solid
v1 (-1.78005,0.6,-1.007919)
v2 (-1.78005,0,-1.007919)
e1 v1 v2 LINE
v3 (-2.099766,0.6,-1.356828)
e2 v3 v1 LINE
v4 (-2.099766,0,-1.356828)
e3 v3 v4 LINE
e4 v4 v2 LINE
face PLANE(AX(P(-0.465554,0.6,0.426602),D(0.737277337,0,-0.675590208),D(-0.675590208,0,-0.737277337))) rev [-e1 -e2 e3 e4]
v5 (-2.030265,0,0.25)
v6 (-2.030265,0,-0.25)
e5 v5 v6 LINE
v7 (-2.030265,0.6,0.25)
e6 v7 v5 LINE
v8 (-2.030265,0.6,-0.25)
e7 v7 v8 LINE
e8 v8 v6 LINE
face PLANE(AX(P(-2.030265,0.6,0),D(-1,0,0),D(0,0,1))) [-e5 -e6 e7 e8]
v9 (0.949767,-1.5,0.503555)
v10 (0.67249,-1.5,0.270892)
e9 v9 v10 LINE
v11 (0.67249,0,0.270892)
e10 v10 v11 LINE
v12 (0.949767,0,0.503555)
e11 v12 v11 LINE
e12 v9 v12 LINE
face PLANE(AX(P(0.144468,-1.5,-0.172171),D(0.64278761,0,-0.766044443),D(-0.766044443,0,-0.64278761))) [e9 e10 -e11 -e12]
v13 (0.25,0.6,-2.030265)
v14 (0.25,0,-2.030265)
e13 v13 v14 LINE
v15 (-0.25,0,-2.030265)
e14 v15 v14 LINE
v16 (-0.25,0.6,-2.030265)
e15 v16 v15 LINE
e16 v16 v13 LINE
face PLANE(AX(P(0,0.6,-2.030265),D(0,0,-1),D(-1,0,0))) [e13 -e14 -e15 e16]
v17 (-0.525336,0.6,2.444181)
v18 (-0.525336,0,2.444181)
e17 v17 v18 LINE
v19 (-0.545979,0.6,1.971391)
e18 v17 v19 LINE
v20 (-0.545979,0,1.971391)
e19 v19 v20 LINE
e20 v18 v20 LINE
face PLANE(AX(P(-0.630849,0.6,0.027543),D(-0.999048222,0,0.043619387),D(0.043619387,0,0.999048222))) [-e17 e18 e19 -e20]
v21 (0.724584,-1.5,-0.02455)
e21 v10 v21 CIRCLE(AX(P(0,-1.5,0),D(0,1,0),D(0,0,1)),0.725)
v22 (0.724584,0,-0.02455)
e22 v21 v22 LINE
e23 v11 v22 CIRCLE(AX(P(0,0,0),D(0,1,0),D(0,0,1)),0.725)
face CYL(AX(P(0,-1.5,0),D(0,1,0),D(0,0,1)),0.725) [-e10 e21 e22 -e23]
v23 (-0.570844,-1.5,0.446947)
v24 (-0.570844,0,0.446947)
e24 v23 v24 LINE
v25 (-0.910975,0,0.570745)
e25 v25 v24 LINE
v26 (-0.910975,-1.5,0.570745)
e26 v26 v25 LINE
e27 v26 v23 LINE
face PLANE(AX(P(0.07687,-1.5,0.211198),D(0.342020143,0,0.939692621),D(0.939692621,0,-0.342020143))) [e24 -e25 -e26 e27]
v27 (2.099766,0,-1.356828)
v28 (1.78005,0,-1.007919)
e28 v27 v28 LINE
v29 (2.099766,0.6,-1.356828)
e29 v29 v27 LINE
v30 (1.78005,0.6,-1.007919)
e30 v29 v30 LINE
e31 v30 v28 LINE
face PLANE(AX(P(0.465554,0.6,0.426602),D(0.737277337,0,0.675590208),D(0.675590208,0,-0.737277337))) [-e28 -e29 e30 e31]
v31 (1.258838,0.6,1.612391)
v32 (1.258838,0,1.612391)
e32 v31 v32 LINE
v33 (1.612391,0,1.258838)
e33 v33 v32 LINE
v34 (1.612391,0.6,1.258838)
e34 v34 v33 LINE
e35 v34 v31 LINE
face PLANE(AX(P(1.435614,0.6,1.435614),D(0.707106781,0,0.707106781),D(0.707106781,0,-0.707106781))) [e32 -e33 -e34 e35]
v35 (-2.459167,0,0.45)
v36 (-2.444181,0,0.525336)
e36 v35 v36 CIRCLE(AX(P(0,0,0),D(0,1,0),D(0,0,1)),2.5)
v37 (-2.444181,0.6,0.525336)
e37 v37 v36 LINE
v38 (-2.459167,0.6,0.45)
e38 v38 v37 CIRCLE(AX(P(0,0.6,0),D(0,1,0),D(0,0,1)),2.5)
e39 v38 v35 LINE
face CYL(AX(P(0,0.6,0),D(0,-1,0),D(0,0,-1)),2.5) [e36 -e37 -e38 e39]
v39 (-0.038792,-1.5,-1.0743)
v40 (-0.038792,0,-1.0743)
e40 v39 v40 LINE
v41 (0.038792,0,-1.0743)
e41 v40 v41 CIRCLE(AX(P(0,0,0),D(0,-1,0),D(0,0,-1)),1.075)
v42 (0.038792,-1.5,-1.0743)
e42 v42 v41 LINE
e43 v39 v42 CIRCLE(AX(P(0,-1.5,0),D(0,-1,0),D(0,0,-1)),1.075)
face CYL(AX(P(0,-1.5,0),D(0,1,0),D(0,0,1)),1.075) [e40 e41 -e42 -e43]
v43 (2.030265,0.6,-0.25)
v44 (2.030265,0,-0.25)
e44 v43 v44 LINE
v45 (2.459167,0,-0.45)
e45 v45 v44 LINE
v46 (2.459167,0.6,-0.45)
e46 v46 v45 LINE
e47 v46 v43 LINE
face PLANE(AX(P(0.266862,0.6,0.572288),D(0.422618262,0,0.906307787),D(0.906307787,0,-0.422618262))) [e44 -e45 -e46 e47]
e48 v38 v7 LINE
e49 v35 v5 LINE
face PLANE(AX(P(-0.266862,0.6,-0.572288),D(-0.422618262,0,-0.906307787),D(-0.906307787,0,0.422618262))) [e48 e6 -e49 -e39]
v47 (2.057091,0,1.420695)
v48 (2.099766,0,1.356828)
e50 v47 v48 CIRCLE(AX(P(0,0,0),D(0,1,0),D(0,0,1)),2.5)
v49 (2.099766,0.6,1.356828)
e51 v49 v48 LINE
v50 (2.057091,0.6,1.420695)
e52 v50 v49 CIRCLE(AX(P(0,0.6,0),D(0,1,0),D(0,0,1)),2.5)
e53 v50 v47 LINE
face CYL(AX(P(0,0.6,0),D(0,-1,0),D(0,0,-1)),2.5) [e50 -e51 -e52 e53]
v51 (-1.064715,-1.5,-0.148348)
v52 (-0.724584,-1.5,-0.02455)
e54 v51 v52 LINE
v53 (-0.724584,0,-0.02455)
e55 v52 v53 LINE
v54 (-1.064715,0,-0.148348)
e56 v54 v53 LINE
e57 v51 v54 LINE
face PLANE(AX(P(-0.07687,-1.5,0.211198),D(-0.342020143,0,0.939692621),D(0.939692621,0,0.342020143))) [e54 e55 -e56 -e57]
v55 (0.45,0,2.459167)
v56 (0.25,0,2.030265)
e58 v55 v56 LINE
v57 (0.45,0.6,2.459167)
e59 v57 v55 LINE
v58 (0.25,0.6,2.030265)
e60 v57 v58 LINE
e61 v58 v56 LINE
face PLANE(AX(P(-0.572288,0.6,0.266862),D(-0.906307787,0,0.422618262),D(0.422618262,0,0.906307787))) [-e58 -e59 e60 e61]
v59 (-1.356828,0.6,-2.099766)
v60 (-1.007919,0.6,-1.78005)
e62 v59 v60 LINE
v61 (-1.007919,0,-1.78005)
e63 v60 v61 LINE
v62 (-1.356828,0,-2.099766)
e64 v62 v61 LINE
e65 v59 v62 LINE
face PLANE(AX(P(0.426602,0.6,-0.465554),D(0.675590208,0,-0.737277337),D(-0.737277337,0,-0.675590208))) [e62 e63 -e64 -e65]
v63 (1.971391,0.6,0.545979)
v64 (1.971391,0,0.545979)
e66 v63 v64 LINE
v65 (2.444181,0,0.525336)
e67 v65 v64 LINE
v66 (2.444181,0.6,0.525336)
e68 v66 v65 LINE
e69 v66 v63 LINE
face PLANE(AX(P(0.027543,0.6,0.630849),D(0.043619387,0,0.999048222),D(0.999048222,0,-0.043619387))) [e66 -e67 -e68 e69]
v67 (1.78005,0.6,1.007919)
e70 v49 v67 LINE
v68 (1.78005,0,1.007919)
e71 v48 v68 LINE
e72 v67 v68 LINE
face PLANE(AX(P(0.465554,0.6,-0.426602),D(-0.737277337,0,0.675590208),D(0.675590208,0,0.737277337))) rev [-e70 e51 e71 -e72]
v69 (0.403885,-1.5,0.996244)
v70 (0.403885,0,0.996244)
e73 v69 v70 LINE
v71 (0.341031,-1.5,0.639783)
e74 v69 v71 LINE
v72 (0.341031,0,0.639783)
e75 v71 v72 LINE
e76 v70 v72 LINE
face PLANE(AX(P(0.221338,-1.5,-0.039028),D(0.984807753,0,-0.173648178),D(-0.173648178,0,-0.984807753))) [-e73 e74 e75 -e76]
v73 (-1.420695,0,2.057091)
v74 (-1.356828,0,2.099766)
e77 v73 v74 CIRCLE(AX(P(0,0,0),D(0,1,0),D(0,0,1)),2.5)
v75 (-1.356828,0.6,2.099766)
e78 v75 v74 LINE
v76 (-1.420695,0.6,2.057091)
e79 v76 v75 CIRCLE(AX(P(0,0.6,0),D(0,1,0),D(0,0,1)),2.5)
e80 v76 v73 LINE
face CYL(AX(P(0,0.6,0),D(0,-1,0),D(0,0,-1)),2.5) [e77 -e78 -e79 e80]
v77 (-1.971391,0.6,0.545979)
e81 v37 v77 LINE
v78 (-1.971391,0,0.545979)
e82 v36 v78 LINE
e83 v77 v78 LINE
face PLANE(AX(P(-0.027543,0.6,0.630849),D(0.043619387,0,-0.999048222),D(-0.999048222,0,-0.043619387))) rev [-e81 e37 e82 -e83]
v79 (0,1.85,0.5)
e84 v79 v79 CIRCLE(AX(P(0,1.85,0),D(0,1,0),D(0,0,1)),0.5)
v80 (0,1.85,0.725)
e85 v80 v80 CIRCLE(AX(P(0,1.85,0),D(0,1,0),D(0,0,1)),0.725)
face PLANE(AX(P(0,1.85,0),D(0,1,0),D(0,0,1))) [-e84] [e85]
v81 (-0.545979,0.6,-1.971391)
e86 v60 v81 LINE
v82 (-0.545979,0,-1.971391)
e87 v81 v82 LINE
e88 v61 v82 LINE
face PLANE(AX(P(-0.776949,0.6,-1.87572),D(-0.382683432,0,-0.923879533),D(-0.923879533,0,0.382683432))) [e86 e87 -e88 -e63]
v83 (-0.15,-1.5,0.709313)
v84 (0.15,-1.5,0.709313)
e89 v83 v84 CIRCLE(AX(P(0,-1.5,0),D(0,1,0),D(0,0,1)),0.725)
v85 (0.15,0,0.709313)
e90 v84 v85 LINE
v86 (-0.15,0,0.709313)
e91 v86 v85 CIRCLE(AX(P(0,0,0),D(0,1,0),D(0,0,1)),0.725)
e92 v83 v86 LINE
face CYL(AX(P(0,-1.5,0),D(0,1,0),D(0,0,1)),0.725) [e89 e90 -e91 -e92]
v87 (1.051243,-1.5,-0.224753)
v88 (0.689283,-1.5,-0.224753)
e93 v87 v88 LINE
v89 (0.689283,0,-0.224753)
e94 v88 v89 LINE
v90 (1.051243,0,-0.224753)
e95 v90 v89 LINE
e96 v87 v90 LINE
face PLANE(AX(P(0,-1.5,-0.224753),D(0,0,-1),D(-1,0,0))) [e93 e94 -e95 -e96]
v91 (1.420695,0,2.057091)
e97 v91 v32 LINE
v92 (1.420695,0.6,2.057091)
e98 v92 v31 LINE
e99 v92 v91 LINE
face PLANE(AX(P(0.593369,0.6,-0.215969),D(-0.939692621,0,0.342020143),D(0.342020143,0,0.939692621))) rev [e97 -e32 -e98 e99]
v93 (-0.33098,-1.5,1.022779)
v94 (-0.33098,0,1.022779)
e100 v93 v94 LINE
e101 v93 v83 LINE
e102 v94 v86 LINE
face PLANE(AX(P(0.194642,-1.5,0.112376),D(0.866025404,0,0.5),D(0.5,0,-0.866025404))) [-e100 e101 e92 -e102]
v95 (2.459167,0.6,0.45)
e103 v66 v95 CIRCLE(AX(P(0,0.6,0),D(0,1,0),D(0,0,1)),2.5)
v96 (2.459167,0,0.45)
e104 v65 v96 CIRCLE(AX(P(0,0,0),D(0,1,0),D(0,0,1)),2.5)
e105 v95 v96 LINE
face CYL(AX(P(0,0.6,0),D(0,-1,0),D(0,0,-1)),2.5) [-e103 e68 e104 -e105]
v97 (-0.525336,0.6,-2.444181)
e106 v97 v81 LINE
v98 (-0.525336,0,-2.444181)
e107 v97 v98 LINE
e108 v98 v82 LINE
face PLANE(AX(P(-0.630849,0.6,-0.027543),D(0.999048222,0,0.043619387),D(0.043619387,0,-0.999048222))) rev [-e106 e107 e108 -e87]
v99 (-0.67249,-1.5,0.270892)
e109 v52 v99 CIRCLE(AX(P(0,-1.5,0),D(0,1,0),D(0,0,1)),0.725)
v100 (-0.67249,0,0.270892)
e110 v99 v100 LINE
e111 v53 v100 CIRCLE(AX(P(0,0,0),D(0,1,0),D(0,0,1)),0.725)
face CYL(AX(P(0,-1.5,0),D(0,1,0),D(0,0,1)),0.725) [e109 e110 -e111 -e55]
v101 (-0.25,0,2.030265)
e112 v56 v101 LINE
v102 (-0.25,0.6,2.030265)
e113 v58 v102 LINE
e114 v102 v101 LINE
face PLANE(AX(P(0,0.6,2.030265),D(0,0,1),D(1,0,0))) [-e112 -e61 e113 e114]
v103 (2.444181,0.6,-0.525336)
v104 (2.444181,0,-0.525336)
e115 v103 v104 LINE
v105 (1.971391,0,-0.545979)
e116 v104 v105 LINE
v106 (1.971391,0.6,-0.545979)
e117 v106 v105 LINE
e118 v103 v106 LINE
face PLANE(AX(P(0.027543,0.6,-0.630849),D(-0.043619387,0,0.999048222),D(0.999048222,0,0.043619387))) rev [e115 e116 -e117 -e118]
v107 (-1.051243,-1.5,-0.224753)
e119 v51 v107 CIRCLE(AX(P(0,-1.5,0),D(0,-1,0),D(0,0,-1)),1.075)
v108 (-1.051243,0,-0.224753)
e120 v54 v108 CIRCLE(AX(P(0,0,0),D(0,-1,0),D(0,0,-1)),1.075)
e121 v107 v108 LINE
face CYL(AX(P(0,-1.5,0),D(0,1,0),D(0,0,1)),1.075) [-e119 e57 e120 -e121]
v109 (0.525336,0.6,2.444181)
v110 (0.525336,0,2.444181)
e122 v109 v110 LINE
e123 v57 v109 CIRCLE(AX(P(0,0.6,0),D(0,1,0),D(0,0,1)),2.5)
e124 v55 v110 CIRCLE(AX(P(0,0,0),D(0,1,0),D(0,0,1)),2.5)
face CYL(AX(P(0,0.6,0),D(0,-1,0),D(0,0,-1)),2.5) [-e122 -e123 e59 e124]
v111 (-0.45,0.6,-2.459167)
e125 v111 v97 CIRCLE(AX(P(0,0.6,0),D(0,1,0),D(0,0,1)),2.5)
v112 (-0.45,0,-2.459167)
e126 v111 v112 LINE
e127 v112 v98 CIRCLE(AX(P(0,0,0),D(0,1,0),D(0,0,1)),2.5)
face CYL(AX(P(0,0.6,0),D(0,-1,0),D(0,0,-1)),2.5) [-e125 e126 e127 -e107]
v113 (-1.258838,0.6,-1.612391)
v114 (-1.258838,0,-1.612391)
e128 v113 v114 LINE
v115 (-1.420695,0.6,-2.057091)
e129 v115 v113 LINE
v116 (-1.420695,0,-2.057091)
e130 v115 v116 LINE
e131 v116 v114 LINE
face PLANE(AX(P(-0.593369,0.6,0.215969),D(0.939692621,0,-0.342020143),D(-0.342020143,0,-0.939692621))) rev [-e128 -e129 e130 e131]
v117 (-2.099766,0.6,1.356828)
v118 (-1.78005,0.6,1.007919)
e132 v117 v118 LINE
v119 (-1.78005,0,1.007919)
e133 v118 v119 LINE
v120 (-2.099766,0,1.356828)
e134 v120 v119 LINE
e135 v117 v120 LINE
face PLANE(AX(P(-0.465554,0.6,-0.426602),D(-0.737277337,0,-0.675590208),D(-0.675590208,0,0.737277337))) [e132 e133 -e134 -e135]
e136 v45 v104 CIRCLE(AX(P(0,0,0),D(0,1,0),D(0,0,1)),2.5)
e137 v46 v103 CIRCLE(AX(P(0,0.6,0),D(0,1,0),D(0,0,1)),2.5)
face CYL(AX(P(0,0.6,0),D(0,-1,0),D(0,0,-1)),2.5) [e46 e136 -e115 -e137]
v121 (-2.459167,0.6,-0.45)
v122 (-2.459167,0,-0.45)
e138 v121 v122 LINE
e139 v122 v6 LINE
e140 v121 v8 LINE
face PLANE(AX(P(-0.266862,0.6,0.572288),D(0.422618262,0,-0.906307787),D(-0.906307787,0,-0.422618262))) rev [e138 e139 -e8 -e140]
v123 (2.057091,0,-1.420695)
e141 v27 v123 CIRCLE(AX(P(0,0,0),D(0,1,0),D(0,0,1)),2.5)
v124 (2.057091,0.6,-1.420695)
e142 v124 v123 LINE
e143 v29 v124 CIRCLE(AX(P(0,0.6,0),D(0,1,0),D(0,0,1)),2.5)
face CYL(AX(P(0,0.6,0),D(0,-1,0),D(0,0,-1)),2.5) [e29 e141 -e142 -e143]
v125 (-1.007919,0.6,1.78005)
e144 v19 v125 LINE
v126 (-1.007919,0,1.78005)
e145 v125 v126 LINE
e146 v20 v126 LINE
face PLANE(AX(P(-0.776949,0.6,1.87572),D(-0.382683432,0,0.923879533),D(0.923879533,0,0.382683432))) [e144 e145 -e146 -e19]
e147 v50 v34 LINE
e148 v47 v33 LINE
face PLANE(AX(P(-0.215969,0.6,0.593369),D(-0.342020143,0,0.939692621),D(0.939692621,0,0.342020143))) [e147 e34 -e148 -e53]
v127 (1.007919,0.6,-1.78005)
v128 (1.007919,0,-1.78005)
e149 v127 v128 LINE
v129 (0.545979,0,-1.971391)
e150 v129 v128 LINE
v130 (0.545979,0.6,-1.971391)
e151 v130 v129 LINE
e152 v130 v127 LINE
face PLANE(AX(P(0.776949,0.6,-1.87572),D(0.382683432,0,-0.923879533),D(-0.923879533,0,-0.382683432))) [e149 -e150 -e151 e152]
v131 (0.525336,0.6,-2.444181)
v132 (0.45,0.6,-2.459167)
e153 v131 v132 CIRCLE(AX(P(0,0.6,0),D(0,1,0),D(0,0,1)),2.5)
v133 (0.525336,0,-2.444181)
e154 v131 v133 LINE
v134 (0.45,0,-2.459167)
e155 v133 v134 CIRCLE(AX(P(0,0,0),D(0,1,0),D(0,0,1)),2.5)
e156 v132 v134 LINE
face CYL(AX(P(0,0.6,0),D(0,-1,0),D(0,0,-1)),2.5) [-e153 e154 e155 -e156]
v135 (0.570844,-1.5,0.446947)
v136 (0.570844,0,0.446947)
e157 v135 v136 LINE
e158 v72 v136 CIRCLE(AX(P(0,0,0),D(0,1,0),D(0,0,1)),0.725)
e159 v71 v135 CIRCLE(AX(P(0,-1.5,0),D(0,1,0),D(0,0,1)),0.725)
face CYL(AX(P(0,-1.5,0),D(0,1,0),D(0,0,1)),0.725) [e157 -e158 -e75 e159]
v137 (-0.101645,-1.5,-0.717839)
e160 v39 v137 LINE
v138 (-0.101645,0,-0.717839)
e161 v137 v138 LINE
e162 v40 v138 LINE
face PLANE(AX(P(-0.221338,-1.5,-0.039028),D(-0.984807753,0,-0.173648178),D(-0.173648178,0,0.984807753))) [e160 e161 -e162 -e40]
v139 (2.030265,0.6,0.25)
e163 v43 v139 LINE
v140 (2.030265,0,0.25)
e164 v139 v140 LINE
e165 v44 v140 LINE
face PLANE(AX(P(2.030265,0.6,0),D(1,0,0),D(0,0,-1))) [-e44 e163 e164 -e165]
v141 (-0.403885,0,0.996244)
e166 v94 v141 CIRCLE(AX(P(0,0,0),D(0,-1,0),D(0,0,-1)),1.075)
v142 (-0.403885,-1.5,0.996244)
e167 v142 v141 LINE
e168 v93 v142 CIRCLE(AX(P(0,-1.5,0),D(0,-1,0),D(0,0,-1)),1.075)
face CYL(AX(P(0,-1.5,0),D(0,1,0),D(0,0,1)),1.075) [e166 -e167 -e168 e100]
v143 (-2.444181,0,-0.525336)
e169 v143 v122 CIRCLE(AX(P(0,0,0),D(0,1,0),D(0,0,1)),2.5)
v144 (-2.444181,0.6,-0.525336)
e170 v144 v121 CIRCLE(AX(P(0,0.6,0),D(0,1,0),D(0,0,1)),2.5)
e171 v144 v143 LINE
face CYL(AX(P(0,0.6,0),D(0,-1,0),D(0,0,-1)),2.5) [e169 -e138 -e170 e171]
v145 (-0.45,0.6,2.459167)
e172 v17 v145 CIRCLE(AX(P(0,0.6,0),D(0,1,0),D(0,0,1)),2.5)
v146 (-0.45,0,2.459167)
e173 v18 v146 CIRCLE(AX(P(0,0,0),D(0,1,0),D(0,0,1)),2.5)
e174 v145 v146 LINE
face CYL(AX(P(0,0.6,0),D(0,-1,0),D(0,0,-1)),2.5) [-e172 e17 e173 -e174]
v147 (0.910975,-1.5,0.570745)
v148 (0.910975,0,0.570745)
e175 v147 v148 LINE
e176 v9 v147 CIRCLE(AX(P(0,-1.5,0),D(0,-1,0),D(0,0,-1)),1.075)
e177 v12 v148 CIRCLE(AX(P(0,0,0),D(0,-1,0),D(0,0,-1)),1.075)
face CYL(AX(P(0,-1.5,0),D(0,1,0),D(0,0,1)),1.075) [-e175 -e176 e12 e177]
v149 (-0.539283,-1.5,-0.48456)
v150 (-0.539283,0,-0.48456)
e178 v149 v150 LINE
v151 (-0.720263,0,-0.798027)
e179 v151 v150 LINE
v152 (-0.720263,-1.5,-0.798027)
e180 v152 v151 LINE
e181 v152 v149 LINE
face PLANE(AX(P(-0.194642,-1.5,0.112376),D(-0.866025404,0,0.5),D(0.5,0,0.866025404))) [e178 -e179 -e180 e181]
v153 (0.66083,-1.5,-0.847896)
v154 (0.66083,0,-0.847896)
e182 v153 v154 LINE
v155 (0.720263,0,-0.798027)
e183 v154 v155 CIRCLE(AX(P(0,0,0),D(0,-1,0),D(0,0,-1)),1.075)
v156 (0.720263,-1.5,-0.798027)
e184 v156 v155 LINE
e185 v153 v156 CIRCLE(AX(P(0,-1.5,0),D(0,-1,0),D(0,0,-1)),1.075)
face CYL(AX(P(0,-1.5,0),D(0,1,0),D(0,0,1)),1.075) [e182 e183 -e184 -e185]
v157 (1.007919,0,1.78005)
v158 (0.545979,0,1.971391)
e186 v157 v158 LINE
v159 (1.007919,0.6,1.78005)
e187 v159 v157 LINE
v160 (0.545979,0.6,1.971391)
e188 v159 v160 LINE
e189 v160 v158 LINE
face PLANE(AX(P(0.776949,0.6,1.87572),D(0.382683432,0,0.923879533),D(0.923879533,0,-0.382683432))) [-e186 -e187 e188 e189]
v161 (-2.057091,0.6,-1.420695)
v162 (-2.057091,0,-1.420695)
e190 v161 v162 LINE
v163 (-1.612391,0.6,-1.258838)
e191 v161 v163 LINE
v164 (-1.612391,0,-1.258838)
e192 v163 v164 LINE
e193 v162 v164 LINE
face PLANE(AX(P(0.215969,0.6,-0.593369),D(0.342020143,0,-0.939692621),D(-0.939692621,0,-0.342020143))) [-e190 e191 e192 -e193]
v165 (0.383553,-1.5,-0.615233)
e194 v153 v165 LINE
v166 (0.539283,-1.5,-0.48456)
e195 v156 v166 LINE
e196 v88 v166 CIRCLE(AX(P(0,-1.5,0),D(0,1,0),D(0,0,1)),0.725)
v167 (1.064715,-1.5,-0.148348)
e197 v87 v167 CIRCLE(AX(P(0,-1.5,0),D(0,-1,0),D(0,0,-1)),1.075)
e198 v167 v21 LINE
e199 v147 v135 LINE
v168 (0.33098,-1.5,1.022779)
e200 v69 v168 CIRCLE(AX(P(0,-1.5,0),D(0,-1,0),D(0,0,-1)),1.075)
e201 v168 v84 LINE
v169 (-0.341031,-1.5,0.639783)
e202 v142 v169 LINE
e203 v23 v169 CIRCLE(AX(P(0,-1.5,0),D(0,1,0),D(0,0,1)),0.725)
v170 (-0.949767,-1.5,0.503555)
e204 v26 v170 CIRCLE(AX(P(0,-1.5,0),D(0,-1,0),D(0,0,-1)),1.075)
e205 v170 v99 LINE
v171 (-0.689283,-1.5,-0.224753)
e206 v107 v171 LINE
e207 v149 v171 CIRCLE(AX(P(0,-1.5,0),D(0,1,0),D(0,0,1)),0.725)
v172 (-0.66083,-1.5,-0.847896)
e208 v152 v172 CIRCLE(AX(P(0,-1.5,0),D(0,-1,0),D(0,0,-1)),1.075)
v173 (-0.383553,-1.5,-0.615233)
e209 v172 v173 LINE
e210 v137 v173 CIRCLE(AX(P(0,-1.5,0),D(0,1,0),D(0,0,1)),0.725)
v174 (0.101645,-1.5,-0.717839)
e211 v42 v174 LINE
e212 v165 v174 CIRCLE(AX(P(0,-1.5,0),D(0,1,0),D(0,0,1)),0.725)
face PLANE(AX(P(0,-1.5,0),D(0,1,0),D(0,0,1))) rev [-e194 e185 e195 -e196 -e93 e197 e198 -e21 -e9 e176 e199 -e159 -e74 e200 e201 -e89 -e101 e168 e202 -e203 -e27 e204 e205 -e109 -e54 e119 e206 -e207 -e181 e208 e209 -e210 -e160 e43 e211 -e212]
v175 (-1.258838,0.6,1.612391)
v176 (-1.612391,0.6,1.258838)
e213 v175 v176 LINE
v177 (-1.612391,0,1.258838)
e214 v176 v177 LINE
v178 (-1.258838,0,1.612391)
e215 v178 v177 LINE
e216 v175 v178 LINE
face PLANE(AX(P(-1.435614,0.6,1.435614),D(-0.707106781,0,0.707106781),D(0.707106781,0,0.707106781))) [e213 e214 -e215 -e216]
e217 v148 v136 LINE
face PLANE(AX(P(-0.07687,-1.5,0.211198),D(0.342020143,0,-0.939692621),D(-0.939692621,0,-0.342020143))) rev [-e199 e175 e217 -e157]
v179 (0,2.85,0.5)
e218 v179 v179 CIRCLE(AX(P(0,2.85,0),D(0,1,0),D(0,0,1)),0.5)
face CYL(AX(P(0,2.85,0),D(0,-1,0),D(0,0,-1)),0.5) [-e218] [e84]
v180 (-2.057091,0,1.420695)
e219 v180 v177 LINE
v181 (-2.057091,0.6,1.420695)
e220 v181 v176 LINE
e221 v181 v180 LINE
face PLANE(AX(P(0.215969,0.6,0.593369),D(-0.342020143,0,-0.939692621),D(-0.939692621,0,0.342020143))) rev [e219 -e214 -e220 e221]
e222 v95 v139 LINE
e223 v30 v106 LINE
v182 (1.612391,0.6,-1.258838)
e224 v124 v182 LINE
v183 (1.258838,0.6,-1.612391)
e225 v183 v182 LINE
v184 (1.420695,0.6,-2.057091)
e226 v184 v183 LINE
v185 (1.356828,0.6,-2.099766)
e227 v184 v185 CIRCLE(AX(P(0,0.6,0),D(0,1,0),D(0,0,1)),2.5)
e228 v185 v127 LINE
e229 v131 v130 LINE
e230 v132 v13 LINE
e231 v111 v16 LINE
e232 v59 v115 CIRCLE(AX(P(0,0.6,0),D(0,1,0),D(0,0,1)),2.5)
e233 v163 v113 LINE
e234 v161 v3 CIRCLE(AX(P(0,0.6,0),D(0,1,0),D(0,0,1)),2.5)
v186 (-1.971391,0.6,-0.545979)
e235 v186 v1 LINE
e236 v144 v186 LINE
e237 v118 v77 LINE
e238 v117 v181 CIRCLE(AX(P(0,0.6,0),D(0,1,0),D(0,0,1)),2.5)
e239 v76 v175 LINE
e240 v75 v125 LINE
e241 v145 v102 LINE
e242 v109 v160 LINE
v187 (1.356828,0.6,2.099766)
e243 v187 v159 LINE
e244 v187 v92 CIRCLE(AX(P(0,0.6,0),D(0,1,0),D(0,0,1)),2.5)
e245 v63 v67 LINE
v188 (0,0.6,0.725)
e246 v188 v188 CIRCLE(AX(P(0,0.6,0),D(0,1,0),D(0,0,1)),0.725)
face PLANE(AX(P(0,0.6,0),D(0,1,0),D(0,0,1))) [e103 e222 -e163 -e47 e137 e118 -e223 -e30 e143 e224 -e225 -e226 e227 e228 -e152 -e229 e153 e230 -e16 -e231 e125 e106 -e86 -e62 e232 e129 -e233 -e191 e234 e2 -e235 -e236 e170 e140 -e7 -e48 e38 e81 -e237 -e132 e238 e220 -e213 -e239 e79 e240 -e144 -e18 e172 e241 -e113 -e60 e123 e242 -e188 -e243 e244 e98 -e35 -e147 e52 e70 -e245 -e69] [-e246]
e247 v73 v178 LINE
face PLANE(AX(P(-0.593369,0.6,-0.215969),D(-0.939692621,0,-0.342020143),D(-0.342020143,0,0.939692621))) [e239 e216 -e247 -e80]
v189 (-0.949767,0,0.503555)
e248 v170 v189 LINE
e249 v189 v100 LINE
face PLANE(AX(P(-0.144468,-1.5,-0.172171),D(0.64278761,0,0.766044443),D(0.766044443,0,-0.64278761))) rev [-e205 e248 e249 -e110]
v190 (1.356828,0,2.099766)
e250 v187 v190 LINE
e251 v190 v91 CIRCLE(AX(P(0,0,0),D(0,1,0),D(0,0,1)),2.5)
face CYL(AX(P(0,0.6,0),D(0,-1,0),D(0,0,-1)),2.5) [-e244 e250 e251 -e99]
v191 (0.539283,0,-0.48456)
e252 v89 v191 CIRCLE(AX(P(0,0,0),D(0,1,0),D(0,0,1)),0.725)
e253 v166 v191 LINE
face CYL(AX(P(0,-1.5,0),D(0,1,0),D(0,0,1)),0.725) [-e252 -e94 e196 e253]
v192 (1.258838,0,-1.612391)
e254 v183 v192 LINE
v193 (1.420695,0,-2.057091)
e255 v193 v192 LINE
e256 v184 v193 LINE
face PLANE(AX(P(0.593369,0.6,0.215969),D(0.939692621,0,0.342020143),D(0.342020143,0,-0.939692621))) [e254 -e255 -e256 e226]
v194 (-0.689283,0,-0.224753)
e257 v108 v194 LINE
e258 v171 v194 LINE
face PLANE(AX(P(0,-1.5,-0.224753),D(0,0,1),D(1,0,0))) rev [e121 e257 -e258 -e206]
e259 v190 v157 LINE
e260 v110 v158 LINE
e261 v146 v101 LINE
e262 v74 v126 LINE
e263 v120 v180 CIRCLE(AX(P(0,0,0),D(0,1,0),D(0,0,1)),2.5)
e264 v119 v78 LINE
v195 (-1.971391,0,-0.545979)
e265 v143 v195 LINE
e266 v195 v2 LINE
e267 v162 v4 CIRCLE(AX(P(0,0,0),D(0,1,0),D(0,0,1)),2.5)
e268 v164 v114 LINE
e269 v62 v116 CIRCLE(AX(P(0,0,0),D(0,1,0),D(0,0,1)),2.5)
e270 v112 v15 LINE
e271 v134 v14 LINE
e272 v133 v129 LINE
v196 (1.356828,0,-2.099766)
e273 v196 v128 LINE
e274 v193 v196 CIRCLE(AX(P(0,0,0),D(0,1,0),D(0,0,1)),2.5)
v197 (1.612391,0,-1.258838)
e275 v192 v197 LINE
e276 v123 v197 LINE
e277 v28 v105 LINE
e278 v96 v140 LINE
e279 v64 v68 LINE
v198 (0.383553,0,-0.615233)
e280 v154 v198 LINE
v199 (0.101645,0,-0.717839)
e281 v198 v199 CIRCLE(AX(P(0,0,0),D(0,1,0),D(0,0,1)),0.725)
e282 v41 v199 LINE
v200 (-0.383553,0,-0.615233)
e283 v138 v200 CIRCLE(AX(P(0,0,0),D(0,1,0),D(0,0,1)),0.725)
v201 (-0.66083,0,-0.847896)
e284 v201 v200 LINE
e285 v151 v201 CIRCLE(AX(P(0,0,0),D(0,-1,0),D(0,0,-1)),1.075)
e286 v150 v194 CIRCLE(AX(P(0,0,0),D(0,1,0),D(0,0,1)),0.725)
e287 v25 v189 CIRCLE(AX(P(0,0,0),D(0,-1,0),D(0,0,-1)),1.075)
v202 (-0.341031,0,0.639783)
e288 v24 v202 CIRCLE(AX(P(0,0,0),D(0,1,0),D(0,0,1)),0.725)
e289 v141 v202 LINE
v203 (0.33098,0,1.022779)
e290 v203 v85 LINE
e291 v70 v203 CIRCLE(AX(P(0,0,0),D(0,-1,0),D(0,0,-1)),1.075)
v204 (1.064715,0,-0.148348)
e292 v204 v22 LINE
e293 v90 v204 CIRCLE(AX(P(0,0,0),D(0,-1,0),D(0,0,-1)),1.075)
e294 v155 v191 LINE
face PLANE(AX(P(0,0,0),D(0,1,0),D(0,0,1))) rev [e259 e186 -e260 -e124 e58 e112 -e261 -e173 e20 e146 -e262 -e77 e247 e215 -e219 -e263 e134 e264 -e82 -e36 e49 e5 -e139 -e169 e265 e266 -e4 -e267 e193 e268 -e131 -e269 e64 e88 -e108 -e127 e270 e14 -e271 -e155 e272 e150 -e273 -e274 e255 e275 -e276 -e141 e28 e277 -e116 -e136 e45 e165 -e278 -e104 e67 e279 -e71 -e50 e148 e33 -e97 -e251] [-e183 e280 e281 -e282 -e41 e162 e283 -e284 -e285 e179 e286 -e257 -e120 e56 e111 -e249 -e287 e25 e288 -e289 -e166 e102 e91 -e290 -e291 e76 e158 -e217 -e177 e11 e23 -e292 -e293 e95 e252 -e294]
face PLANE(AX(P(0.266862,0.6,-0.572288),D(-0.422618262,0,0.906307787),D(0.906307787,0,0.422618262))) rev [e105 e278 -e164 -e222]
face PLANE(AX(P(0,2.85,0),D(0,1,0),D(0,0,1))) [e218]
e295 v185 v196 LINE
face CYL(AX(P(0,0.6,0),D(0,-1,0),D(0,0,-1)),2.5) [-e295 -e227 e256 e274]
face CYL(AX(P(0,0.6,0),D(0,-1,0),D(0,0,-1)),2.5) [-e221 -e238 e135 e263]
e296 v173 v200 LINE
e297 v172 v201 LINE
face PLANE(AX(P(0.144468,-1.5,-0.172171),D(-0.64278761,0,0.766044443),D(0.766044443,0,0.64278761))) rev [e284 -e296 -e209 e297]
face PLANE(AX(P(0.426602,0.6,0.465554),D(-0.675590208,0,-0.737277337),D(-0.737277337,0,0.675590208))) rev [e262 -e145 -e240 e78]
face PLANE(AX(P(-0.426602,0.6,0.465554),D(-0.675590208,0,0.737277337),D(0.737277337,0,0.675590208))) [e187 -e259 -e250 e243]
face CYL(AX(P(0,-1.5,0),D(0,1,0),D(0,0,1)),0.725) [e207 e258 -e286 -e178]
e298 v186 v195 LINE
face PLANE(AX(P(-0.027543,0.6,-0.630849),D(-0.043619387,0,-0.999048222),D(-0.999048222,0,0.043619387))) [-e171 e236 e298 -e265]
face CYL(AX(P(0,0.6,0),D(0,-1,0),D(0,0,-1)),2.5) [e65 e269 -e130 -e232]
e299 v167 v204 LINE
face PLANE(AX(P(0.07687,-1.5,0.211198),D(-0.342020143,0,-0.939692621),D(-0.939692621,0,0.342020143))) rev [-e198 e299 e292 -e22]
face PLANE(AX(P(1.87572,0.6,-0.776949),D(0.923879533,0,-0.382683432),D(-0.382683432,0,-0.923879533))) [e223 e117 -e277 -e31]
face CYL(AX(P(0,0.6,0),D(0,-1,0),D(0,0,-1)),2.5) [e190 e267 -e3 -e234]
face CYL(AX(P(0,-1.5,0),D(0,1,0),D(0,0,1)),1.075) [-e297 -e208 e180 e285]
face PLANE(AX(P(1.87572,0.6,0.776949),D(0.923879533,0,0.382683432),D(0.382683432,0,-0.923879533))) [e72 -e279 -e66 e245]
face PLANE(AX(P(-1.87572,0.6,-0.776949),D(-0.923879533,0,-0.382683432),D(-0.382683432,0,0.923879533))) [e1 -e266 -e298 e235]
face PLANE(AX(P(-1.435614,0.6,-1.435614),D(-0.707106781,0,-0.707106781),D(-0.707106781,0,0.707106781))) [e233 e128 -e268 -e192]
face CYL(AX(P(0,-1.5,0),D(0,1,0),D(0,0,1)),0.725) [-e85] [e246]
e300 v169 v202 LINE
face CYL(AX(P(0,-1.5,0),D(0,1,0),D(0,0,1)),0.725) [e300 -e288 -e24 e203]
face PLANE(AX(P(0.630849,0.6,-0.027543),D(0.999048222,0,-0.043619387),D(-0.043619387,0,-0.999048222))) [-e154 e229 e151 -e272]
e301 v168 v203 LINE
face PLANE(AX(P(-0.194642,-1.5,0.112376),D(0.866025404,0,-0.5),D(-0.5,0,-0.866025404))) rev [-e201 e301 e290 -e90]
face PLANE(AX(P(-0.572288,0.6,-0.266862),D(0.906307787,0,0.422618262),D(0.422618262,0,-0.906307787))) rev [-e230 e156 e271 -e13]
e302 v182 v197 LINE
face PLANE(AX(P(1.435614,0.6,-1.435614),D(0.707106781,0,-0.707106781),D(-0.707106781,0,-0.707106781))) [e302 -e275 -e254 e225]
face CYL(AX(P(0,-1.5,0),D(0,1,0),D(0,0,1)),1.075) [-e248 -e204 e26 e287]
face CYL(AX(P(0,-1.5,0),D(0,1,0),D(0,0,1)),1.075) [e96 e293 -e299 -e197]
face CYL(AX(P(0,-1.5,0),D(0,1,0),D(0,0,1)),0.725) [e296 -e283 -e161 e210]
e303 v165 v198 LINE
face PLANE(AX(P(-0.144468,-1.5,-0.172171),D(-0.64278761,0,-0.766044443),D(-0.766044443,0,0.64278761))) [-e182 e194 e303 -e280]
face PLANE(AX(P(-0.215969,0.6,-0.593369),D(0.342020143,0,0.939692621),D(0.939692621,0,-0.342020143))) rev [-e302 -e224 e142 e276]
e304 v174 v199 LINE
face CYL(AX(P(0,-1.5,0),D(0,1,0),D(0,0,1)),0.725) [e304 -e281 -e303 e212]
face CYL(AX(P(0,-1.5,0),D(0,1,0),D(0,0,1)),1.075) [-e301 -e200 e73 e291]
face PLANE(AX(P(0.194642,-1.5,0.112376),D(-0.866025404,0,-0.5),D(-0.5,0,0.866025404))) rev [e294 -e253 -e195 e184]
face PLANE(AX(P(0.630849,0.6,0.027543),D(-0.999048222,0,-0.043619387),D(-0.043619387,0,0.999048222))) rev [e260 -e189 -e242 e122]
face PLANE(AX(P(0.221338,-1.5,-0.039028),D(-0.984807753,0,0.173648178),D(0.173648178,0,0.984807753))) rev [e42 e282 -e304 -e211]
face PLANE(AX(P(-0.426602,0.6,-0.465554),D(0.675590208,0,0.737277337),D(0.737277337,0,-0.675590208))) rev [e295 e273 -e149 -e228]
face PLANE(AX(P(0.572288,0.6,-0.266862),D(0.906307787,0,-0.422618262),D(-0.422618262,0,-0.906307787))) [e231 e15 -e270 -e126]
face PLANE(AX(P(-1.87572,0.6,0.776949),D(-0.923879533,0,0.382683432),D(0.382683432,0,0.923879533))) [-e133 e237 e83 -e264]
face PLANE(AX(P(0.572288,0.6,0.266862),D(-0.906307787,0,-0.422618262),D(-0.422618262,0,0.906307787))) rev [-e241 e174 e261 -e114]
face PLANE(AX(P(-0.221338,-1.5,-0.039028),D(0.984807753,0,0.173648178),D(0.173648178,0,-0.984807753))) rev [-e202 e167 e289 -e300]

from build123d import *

# Parameters (mm, degrees)
BOSS_EXTRUDE1_DEPTH      = 0.6
BOSS_EXTRUDE2_DEPTH      = 1.25
BOSS_EXTRUDE2_DEPTH_BACK = 2.1
SKETCH2_R                = 0.725
SKETCH3_R                = 0.5
BOSS_EXTRUDE3_DEPTH      = 1
BOSS_EXTRUDE4_DEPTH      = 1.5


# Read off the part's stored shape, not the designer's step: Boss-Extrude1
with BuildPart() as part:
    # Boss-Extrude1 outline → Boss-Extrude1 (new body)
    with BuildSketch(Plane(origin=(0, 0, 0), x_dir=(1, 0, 0), z_dir=(0, 1, 0))):
        with BuildLine():
            Line((2.459166525, -0.45), (2.030265141, -0.25))
            Line((2.030265141, -0.25), (2.030265141, 0.25))
            Line((2.030265141, 0.25), (2.459166525, 0.45))
            ThreePointArc((2.459166525, 0.45), (2.451963201, 0.487725805), (2.444181164, 0.525336497))
            Line((2.444181164, 0.525336497), (1.971391268, 0.54597895))
            Line((1.971391268, 0.54597895), (1.780049552, 1.007918716))
            Line((1.780049552, 1.007918716), (2.099766075, 1.356828076))
            ThreePointArc((2.099766075, 1.356828076), (2.078674031, 1.388925583), (2.057091378, 1.420695275))
            Line((2.057091378, 1.420695275), (1.612390944, 1.258837554))
            Line((1.612390944, 1.258837554), (1.258837554, 1.612390944))
            Line((1.258837554, 1.612390944), (1.420695275, 2.057091378))
            ThreePointArc((1.420695275, 2.057091378), (1.388925583, 2.078674031), (1.356828076, 2.099766075))
            Line((1.356828076, 2.099766075), (1.007918716, 1.780049552))
            Line((1.007918716, 1.780049552), (0.54597895, 1.971391268))
            Line((0.54597895, 1.971391268), (0.525336497, 2.444181164))
            ThreePointArc((0.525336497, 2.444181164), (0.487725805, 2.451963201), (0.45, 2.459166525))
            Line((0.45, 2.459166525), (0.25, 2.030265141))
            Line((0.25, 2.030265141), (-0.25, 2.030265141))
            Line((-0.25, 2.030265141), (-0.45, 2.459166525))
            ThreePointArc((-0.45, 2.459166525), (-0.487725805, 2.451963201), (-0.525336497, 2.444181164))
            Line((-0.525336497, 2.444181164), (-0.54597895, 1.971391268))
            Line((-0.54597895, 1.971391268), (-1.007918716, 1.780049552))
            Line((-1.007918716, 1.780049552), (-1.356828076, 2.099766075))
            ThreePointArc((-1.356828076, 2.099766075), (-1.388925583, 2.078674031), (-1.420695275, 2.057091378))
            Line((-1.420695275, 2.057091378), (-1.258837554, 1.612390944))
            Line((-1.258837554, 1.612390944), (-1.612390944, 1.258837554))
            Line((-1.612390944, 1.258837554), (-2.057091378, 1.420695275))
            ThreePointArc((-2.057091378, 1.420695275), (-2.078674031, 1.388925583), (-2.099766075, 1.356828076))
            Line((-2.099766075, 1.356828076), (-1.780049552, 1.007918716))
            Line((-1.780049552, 1.007918716), (-1.971391268, 0.54597895))
            Line((-1.971391268, 0.54597895), (-2.444181164, 0.525336497))
            ThreePointArc((-2.444181164, 0.525336497), (-2.451963201, 0.487725805), (-2.459166525, 0.45))
            Line((-2.459166525, 0.45), (-2.030265141, 0.25))
            Line((-2.030265141, 0.25), (-2.030265141, -0.25))
            Line((-2.030265141, -0.25), (-2.459166525, -0.45))
            ThreePointArc((-2.459166525, -0.45), (-2.451963201, -0.487725805), (-2.444181164, -0.525336497))
            Line((-2.444181164, -0.525336497), (-1.971391268, -0.54597895))
            Line((-1.971391268, -0.54597895), (-1.780049552, -1.007918716))
            Line((-1.780049552, -1.007918716), (-2.099766075, -1.356828076))
            ThreePointArc((-2.099766075, -1.356828076), (-2.078674031, -1.388925583), (-2.057091378, -1.420695275))
            Line((-2.057091378, -1.420695275), (-1.612390944, -1.258837554))
            Line((-1.612390944, -1.258837554), (-1.258837554, -1.612390944))
            Line((-1.258837554, -1.612390944), (-1.420695275, -2.057091378))
            ThreePointArc((-1.420695275, -2.057091378), (-1.388925583, -2.078674031), (-1.356828076, -2.099766075))
            Line((-1.356828076, -2.099766075), (-1.007918716, -1.780049552))
            Line((-1.007918716, -1.780049552), (-0.54597895, -1.971391268))
            Line((-0.54597895, -1.971391268), (-0.525336497, -2.444181164))
            ThreePointArc((-0.525336497, -2.444181164), (-0.487725805, -2.451963201), (-0.45, -2.459166525))
            Line((-0.45, -2.459166525), (-0.25, -2.030265141))
            Line((-0.25, -2.030265141), (0.25, -2.030265141))
            Line((0.25, -2.030265141), (0.45, -2.459166525))
            ThreePointArc((0.45, -2.459166525), (0.487725805, -2.451963201), (0.525336497, -2.444181164))
            Line((0.525336497, -2.444181164), (0.54597895, -1.971391268))
            Line((0.54597895, -1.971391268), (1.007918716, -1.780049552))
            Line((1.007918716, -1.780049552), (1.356828076, -2.099766075))
            ThreePointArc((1.356828076, -2.099766075), (1.388925583, -2.078674031), (1.420695275, -2.057091378))
            Line((1.420695275, -2.057091378), (1.258837554, -1.612390944))
            Line((1.258837554, -1.612390944), (1.612390944, -1.258837554))
            Line((1.612390944, -1.258837554), (2.057091378, -1.420695275))
            ThreePointArc((2.057091378, -1.420695275), (2.078674031, -1.388925583), (2.099766075, -1.356828076))
            Line((2.099766075, -1.356828076), (1.780049552, -1.007918716))
            Line((1.780049552, -1.007918716), (1.971391268, -0.54597895))
            Line((1.971391268, -0.54597895), (2.444181164, -0.525336497))
            ThreePointArc((2.444181164, -0.525336497), (2.451963201, -0.487725805), (2.459166525, -0.45))
        make_face()
    extrude(amount=BOSS_EXTRUDE1_DEPTH)

    # Sketch2 → Boss-Extrude2 (add, two sides: drawn at the far end of the back side and taken through both)
    with BuildSketch(Plane(origin=(0, 0.6, 0), x_dir=(1, 0, 0), z_dir=(0, 1, 0)).offset(-BOSS_EXTRUDE2_DEPTH_BACK)):
        with Locations(Location((0, 0, 0), (0, 0, 270))):
            Circle(SKETCH2_R)
    extrude(amount=BOSS_EXTRUDE2_DEPTH + BOSS_EXTRUDE2_DEPTH_BACK)

    # Sketch3 → Boss-Extrude3 (add)
    with BuildSketch(Plane(origin=(0, 1.85, 0), x_dir=(1, 0, 0), z_dir=(0, 1, 0))):
        with Locations(Location((0, 0, 0), (0, 0, 270))):
            Circle(SKETCH3_R)
    extrude(amount=BOSS_EXTRUDE3_DEPTH)

    # Sketch4 → Boss-Extrude4 (add)
    with BuildSketch(Plane(origin=(0, 0, 0), x_dir=(-1, 0, 0), z_dir=(0, -1, 0))):
        with BuildLine():
            Line((0.15, -0.709313048), (0.330979791, -1.022779242))
            ThreePointArc((0.330979791, -1.022779242), (0.367671654, -1.010169567), (0.403884594, -0.996244064))
            Line((0.403884594, -0.996244064), (0.341030972, -0.63978346))
            ThreePointArc((0.341030972, -0.63978346), (0.247964604, -0.68127715), (0.15, -0.709313048))
        make_face()
        with BuildLine():
            ThreePointArc((-0.403884594, -0.996244064), (-0.367671654, -1.010169567), (-0.330979791, -1.022779242))
            Line((-0.330979791, -1.022779242), (-0.15, -0.709313048))
            ThreePointArc((-0.15, -0.709313048), (-0.247964604, -0.68127715), (-0.341030972, -0.63978346))
            Line((-0.341030972, -0.63978346), (-0.403884594, -0.996244064))
        make_face()
        with BuildLine():
            Line((0.570844305, -0.446947177), (0.910975054, -0.570744646))
            ThreePointArc((0.910975054, -0.570744646), (0.930977309, -0.5375), (0.949766889, -0.503555216))
            Line((0.949766889, -0.503555216), (0.672489762, -0.270892081))
            ThreePointArc((0.672489762, -0.270892081), (0.627868418, -0.3625), (0.570844305, -0.446947177))
        make_face()
        with BuildLine():
            ThreePointArc((-0.949766889, -0.503555216), (-0.930977309, -0.5375), (-0.910975054, -0.570744646))
            Line((-0.910975054, -0.570744646), (-0.570844305, -0.446947177))
            ThreePointArc((-0.570844305, -0.446947177), (-0.627868418, -0.3625), (-0.672489762, -0.270892081))
            Line((-0.672489762, -0.270892081), (-0.949766889, -0.503555216))
        make_face()
        with BuildLine():
            ThreePointArc((0.689283119, 0.224752713), (0.713985621, 0.125894929), (0.724584216, 0.024550245))
            Line((0.724584216, 0.024550245), (1.064714965, 0.148347713))
            ThreePointArc((1.064714965, 0.148347713), (1.058668334, 0.186671791), (1.051242702, 0.224752713))
            Line((1.051242702, 0.224752713), (0.689283119, 0.224752713))
        make_face()
        with BuildLine():
            ThreePointArc((-1.051242702, 0.224752713), (-1.058668334, 0.186671791), (-1.064714965, 0.148347713))
            Line((-1.064714965, 0.148347713), (-0.724584216, 0.024550245))
            ThreePointArc((-0.724584216, 0.024550245), (-0.713985621, 0.125894929), (-0.689283119, 0.224752713))
            Line((-0.689283119, 0.224752713), (-1.051242702, 0.224752713))
        make_face()
        with BuildLine():
            ThreePointArc((0.383553243, 0.615233215), (0.466021017, 0.555382221), (0.539283119, 0.484560335))
            Line((0.539283119, 0.484560335), (0.72026291, 0.798026528))
            ThreePointArc((0.72026291, 0.798026528), (0.69099668, 0.823497776), (0.660830371, 0.847896351))
            Line((0.660830371, 0.847896351), (0.383553243, 0.615233215))
        make_face()
        with BuildLine():
            ThreePointArc((-0.660830371, 0.847896351), (-0.69099668, 0.823497776), (-0.72026291, 0.798026528))
            Line((-0.72026291, 0.798026528), (-0.539283119, 0.484560335))
            ThreePointArc((-0.539283119, 0.484560335), (-0.466021017, 0.555382221), (-0.383553243, 0.615233215))
            Line((-0.383553243, 0.615233215), (-0.660830371, 0.847896351))
        make_face()
        with BuildLine():
            ThreePointArc((-0.101645457, 0.717839258), (0, 0.725), (0.101645457, 0.717839258))
            Line((0.101645457, 0.717839258), (0.038791835, 1.074299862))
            ThreePointArc((0.038791835, 1.074299862), (0, 1.075), (-0.038791835, 1.074299862))
            Line((-0.038791835, 1.074299862), (-0.101645457, 0.717839258))
        make_face()
    extrude(amount=BOSS_EXTRUDE4_DEPTH)


solid = part.part
